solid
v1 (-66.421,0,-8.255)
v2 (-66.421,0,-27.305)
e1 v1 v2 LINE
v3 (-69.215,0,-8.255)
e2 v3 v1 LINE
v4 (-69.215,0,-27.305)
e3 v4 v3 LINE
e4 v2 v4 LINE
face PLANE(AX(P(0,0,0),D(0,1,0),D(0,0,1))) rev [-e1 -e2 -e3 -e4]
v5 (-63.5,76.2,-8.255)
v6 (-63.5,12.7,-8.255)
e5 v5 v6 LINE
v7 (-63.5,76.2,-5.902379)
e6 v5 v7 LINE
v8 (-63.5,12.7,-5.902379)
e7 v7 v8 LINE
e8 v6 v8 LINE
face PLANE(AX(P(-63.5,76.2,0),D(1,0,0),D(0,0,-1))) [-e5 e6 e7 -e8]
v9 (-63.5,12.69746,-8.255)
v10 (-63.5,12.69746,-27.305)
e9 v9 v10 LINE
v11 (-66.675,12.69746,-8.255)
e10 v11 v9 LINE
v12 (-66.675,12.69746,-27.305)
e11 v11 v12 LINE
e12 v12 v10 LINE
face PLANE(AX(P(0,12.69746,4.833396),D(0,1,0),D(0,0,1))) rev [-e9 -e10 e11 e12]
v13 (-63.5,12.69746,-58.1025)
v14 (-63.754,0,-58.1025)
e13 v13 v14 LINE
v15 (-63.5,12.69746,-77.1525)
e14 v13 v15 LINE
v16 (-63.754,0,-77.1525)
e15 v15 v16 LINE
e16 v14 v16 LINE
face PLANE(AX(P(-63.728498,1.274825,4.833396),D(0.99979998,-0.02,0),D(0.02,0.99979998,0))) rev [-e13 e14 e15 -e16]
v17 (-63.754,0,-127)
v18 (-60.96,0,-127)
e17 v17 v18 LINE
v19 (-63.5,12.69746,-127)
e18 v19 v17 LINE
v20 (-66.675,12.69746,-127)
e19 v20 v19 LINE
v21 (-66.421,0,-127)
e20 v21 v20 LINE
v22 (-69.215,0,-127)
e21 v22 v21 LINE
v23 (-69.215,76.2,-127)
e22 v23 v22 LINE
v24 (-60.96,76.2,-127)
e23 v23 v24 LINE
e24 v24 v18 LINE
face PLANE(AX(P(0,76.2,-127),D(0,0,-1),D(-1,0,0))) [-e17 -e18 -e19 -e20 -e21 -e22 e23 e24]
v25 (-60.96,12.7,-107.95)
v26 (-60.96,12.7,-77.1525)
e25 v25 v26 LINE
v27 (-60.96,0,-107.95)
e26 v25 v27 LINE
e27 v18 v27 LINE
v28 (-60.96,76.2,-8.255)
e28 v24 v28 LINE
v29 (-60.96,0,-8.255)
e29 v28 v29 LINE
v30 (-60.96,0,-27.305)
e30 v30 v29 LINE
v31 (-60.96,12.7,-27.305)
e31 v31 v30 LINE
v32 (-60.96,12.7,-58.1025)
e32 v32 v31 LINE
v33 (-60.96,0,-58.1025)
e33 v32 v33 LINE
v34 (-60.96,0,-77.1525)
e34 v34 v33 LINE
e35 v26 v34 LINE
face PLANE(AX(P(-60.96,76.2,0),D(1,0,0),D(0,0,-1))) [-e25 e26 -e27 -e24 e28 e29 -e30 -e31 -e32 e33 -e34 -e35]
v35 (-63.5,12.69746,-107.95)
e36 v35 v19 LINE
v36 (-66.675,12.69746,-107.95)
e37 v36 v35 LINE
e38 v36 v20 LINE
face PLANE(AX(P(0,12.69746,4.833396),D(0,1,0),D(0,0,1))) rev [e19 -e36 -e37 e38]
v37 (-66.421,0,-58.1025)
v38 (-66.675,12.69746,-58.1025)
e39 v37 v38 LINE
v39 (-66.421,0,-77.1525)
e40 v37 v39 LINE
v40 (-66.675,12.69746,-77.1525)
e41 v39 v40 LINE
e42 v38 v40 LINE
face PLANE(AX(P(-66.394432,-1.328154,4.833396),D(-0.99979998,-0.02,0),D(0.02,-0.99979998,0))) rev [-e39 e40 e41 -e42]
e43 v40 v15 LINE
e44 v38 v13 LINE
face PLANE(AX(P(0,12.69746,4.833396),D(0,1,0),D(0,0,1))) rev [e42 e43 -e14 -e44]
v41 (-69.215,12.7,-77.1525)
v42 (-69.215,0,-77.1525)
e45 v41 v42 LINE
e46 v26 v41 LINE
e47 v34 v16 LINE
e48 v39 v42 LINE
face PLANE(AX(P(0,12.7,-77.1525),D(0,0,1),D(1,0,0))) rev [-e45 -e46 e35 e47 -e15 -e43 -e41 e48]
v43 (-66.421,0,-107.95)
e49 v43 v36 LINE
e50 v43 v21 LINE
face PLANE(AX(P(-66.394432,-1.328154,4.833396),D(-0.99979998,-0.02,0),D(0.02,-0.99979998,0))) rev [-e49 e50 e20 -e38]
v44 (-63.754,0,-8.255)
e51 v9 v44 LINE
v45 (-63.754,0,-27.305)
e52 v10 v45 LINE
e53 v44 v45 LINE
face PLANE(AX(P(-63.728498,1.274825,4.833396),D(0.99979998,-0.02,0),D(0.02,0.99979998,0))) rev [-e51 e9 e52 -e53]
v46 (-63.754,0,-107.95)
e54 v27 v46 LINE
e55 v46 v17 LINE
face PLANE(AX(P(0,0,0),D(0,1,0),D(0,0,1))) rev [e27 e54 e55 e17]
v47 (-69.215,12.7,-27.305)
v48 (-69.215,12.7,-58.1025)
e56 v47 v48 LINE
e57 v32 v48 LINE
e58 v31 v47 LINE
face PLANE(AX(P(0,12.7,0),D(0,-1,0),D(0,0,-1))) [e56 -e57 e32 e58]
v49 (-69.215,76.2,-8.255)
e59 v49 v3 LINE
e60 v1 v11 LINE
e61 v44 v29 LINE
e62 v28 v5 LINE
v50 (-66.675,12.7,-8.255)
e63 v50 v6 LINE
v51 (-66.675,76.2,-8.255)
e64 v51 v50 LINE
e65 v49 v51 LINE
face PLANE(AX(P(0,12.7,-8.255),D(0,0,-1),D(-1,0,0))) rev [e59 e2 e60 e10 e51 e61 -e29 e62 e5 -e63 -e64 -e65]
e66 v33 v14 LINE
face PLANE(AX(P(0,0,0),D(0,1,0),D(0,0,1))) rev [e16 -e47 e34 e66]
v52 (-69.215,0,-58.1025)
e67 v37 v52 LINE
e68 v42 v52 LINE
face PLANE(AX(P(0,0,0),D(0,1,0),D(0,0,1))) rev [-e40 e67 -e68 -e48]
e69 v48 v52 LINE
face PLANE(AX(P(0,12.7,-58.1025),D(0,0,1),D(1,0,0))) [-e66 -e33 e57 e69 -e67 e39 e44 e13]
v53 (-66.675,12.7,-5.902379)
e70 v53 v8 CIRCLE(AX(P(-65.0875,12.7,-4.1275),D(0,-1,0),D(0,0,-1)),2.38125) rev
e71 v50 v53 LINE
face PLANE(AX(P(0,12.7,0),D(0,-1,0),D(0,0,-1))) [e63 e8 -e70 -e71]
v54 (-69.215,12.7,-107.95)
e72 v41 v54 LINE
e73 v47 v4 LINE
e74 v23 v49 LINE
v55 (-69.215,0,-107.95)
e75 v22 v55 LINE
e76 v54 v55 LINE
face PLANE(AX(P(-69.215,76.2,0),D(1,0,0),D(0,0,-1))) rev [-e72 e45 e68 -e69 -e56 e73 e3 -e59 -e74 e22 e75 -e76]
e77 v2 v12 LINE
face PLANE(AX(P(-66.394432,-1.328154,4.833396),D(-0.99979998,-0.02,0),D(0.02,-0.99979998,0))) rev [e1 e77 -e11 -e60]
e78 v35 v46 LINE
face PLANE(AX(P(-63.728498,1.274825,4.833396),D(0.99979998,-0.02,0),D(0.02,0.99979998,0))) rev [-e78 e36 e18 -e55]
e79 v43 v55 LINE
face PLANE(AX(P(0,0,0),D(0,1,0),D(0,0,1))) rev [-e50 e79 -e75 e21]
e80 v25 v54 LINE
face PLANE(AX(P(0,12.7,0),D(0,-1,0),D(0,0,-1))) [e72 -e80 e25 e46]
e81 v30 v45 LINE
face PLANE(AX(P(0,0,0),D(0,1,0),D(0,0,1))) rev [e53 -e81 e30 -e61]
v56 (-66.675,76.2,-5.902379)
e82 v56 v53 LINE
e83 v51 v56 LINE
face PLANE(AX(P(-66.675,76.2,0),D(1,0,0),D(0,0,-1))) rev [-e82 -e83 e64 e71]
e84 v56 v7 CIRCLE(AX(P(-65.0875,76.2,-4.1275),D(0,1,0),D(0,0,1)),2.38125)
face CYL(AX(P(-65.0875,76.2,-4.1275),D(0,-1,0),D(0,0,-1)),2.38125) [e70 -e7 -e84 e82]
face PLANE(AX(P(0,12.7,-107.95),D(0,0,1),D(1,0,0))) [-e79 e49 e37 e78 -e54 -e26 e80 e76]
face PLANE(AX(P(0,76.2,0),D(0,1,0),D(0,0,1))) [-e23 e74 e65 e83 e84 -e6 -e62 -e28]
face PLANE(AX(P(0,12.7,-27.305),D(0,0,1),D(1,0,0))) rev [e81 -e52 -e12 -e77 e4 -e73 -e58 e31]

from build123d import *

# Parameters (mm, degrees)
BOSS_EXTRUDE1_DEPTH    = 76.2
CUT_EXTRUDE1_DEPTH     = 118.745
CUT_EXTRUDE2_START     = -12.7
CUT_EXTRUDE2_OUTLINE_W = 8.255
CUT_EXTRUDE2_OUTLINE_H = 30.7975
CUT_EXTRUDE2_DEPTH     = 12.7
SIDECUT_DEPTH          = 166.55395044


# Read off the part's stored shape, not the designer's step: Cut-Extrude2
with BuildPart() as part:
    # Sketch8 → Boss-Extrude1 (new body)
    with BuildSketch(Plane(origin=(0, 0, 0), x_dir=(1, 0, 0), z_dir=(0, 1, 0))):
        Polygon((-73.9775, 8.255), (-73.9775, 0), (73.9775, 0), (73.9775, 8.255), (69.215, 8.255), (69.215, 127), (60.96, 127), (60.96, 8.255), (-60.96, 8.255), (-60.96, 127), (-69.215, 127), (-69.215, 8.255), align=None)
    extrude(amount=BOSS_EXTRUDE1_DEPTH)

    # Sketch9 → Cut-Extrude1 (cut)
    with BuildSketch(Plane(origin=(0, 0, -127), x_dir=(-1, 0, 0), z_dir=(0, 0, -1))):
        Polygon((-66.421, 0), (-66.675, 12.697459746), (-63.5, 12.697459746), (-63.754, 0), align=None)
        Polygon((63.5, 12.697459746), (63.754, 0), (66.421, 0), (66.675, 12.697459746), align=None)
    extrude(amount=-CUT_EXTRUDE1_DEPTH, mode=Mode.SUBTRACT)

    # Cut-Extrude2 outline → Cut-Extrude2 (cut)
    with BuildSketch(Plane.XZ.offset(CUT_EXTRUDE2_START)):
        with Locations((65.0875, -42.70375)):
            Rectangle(CUT_EXTRUDE2_OUTLINE_W, CUT_EXTRUDE2_OUTLINE_H)
        with Locations((65.0875, -92.55125)):
            Rectangle(CUT_EXTRUDE2_OUTLINE_W, CUT_EXTRUDE2_OUTLINE_H)
        Polygon((62.9285, -8.255), (73.9775, -8.255), (73.9775, 0), (62.9285, 0), (62.9285, -2.54), (26.9875, -2.54), (26.9875, 0), (-26.9875, 0), (-26.9875, -2.54), (-62.9285, -2.54), (-62.9285, 0), (-73.9775, 0), (-73.9775, -8.255), (-62.9285, -8.255), (-62.9285, -5.715), (-26.9875, -5.715), (-26.9875, -8.255), (26.9875, -8.255), (26.9875, -5.715), (62.9285, -5.715), align=None)
        with Locations((-65.0875, -42.70375)):
            Rectangle(CUT_EXTRUDE2_OUTLINE_W, CUT_EXTRUDE2_OUTLINE_H)
        with Locations((-65.0875, -92.55125)):
            Rectangle(CUT_EXTRUDE2_OUTLINE_W, CUT_EXTRUDE2_OUTLINE_H)
    extrude(amount=CUT_EXTRUDE2_DEPTH, mode=Mode.SUBTRACT)

    # Sketch8<6> → SideCut (cut, through all)
    with BuildSketch(Plane(origin=(0, 0, 0), x_dir=(1, 0, 0), z_dir=(0, 1, 0))):
        with BuildLine():
            Line((-73.9775, 8.255), (-73.9775, 0))
            Line((-73.9775, 0), (73.9775, 0))
            Line((73.9775, 0), (73.9775, 8.255))
            Line((73.9775, 8.255), (69.215, 8.255))
            Line((69.215, 8.255), (69.215, 127))
            Line((69.215, 127), (60.96, 127))
            Line((60.96, 127), (60.96, 8.255))
            Line((60.96, 8.255), (-63.5, 8.255))
            Line((-63.5, 8.255), (-63.5, 5.902378957))
            ThreePointArc((-63.5, 5.902378957), (-65.0875, 1.74625), (-66.675, 5.902378957))
            Line((-66.675, 5.902378957), (-66.675, 8.255))
            Line((-66.675, 8.255), (-73.9775, 8.255))
        make_face()
    extrude(amount=SIDECUT_DEPTH, mode=Mode.SUBTRACT)


solid = part.part
